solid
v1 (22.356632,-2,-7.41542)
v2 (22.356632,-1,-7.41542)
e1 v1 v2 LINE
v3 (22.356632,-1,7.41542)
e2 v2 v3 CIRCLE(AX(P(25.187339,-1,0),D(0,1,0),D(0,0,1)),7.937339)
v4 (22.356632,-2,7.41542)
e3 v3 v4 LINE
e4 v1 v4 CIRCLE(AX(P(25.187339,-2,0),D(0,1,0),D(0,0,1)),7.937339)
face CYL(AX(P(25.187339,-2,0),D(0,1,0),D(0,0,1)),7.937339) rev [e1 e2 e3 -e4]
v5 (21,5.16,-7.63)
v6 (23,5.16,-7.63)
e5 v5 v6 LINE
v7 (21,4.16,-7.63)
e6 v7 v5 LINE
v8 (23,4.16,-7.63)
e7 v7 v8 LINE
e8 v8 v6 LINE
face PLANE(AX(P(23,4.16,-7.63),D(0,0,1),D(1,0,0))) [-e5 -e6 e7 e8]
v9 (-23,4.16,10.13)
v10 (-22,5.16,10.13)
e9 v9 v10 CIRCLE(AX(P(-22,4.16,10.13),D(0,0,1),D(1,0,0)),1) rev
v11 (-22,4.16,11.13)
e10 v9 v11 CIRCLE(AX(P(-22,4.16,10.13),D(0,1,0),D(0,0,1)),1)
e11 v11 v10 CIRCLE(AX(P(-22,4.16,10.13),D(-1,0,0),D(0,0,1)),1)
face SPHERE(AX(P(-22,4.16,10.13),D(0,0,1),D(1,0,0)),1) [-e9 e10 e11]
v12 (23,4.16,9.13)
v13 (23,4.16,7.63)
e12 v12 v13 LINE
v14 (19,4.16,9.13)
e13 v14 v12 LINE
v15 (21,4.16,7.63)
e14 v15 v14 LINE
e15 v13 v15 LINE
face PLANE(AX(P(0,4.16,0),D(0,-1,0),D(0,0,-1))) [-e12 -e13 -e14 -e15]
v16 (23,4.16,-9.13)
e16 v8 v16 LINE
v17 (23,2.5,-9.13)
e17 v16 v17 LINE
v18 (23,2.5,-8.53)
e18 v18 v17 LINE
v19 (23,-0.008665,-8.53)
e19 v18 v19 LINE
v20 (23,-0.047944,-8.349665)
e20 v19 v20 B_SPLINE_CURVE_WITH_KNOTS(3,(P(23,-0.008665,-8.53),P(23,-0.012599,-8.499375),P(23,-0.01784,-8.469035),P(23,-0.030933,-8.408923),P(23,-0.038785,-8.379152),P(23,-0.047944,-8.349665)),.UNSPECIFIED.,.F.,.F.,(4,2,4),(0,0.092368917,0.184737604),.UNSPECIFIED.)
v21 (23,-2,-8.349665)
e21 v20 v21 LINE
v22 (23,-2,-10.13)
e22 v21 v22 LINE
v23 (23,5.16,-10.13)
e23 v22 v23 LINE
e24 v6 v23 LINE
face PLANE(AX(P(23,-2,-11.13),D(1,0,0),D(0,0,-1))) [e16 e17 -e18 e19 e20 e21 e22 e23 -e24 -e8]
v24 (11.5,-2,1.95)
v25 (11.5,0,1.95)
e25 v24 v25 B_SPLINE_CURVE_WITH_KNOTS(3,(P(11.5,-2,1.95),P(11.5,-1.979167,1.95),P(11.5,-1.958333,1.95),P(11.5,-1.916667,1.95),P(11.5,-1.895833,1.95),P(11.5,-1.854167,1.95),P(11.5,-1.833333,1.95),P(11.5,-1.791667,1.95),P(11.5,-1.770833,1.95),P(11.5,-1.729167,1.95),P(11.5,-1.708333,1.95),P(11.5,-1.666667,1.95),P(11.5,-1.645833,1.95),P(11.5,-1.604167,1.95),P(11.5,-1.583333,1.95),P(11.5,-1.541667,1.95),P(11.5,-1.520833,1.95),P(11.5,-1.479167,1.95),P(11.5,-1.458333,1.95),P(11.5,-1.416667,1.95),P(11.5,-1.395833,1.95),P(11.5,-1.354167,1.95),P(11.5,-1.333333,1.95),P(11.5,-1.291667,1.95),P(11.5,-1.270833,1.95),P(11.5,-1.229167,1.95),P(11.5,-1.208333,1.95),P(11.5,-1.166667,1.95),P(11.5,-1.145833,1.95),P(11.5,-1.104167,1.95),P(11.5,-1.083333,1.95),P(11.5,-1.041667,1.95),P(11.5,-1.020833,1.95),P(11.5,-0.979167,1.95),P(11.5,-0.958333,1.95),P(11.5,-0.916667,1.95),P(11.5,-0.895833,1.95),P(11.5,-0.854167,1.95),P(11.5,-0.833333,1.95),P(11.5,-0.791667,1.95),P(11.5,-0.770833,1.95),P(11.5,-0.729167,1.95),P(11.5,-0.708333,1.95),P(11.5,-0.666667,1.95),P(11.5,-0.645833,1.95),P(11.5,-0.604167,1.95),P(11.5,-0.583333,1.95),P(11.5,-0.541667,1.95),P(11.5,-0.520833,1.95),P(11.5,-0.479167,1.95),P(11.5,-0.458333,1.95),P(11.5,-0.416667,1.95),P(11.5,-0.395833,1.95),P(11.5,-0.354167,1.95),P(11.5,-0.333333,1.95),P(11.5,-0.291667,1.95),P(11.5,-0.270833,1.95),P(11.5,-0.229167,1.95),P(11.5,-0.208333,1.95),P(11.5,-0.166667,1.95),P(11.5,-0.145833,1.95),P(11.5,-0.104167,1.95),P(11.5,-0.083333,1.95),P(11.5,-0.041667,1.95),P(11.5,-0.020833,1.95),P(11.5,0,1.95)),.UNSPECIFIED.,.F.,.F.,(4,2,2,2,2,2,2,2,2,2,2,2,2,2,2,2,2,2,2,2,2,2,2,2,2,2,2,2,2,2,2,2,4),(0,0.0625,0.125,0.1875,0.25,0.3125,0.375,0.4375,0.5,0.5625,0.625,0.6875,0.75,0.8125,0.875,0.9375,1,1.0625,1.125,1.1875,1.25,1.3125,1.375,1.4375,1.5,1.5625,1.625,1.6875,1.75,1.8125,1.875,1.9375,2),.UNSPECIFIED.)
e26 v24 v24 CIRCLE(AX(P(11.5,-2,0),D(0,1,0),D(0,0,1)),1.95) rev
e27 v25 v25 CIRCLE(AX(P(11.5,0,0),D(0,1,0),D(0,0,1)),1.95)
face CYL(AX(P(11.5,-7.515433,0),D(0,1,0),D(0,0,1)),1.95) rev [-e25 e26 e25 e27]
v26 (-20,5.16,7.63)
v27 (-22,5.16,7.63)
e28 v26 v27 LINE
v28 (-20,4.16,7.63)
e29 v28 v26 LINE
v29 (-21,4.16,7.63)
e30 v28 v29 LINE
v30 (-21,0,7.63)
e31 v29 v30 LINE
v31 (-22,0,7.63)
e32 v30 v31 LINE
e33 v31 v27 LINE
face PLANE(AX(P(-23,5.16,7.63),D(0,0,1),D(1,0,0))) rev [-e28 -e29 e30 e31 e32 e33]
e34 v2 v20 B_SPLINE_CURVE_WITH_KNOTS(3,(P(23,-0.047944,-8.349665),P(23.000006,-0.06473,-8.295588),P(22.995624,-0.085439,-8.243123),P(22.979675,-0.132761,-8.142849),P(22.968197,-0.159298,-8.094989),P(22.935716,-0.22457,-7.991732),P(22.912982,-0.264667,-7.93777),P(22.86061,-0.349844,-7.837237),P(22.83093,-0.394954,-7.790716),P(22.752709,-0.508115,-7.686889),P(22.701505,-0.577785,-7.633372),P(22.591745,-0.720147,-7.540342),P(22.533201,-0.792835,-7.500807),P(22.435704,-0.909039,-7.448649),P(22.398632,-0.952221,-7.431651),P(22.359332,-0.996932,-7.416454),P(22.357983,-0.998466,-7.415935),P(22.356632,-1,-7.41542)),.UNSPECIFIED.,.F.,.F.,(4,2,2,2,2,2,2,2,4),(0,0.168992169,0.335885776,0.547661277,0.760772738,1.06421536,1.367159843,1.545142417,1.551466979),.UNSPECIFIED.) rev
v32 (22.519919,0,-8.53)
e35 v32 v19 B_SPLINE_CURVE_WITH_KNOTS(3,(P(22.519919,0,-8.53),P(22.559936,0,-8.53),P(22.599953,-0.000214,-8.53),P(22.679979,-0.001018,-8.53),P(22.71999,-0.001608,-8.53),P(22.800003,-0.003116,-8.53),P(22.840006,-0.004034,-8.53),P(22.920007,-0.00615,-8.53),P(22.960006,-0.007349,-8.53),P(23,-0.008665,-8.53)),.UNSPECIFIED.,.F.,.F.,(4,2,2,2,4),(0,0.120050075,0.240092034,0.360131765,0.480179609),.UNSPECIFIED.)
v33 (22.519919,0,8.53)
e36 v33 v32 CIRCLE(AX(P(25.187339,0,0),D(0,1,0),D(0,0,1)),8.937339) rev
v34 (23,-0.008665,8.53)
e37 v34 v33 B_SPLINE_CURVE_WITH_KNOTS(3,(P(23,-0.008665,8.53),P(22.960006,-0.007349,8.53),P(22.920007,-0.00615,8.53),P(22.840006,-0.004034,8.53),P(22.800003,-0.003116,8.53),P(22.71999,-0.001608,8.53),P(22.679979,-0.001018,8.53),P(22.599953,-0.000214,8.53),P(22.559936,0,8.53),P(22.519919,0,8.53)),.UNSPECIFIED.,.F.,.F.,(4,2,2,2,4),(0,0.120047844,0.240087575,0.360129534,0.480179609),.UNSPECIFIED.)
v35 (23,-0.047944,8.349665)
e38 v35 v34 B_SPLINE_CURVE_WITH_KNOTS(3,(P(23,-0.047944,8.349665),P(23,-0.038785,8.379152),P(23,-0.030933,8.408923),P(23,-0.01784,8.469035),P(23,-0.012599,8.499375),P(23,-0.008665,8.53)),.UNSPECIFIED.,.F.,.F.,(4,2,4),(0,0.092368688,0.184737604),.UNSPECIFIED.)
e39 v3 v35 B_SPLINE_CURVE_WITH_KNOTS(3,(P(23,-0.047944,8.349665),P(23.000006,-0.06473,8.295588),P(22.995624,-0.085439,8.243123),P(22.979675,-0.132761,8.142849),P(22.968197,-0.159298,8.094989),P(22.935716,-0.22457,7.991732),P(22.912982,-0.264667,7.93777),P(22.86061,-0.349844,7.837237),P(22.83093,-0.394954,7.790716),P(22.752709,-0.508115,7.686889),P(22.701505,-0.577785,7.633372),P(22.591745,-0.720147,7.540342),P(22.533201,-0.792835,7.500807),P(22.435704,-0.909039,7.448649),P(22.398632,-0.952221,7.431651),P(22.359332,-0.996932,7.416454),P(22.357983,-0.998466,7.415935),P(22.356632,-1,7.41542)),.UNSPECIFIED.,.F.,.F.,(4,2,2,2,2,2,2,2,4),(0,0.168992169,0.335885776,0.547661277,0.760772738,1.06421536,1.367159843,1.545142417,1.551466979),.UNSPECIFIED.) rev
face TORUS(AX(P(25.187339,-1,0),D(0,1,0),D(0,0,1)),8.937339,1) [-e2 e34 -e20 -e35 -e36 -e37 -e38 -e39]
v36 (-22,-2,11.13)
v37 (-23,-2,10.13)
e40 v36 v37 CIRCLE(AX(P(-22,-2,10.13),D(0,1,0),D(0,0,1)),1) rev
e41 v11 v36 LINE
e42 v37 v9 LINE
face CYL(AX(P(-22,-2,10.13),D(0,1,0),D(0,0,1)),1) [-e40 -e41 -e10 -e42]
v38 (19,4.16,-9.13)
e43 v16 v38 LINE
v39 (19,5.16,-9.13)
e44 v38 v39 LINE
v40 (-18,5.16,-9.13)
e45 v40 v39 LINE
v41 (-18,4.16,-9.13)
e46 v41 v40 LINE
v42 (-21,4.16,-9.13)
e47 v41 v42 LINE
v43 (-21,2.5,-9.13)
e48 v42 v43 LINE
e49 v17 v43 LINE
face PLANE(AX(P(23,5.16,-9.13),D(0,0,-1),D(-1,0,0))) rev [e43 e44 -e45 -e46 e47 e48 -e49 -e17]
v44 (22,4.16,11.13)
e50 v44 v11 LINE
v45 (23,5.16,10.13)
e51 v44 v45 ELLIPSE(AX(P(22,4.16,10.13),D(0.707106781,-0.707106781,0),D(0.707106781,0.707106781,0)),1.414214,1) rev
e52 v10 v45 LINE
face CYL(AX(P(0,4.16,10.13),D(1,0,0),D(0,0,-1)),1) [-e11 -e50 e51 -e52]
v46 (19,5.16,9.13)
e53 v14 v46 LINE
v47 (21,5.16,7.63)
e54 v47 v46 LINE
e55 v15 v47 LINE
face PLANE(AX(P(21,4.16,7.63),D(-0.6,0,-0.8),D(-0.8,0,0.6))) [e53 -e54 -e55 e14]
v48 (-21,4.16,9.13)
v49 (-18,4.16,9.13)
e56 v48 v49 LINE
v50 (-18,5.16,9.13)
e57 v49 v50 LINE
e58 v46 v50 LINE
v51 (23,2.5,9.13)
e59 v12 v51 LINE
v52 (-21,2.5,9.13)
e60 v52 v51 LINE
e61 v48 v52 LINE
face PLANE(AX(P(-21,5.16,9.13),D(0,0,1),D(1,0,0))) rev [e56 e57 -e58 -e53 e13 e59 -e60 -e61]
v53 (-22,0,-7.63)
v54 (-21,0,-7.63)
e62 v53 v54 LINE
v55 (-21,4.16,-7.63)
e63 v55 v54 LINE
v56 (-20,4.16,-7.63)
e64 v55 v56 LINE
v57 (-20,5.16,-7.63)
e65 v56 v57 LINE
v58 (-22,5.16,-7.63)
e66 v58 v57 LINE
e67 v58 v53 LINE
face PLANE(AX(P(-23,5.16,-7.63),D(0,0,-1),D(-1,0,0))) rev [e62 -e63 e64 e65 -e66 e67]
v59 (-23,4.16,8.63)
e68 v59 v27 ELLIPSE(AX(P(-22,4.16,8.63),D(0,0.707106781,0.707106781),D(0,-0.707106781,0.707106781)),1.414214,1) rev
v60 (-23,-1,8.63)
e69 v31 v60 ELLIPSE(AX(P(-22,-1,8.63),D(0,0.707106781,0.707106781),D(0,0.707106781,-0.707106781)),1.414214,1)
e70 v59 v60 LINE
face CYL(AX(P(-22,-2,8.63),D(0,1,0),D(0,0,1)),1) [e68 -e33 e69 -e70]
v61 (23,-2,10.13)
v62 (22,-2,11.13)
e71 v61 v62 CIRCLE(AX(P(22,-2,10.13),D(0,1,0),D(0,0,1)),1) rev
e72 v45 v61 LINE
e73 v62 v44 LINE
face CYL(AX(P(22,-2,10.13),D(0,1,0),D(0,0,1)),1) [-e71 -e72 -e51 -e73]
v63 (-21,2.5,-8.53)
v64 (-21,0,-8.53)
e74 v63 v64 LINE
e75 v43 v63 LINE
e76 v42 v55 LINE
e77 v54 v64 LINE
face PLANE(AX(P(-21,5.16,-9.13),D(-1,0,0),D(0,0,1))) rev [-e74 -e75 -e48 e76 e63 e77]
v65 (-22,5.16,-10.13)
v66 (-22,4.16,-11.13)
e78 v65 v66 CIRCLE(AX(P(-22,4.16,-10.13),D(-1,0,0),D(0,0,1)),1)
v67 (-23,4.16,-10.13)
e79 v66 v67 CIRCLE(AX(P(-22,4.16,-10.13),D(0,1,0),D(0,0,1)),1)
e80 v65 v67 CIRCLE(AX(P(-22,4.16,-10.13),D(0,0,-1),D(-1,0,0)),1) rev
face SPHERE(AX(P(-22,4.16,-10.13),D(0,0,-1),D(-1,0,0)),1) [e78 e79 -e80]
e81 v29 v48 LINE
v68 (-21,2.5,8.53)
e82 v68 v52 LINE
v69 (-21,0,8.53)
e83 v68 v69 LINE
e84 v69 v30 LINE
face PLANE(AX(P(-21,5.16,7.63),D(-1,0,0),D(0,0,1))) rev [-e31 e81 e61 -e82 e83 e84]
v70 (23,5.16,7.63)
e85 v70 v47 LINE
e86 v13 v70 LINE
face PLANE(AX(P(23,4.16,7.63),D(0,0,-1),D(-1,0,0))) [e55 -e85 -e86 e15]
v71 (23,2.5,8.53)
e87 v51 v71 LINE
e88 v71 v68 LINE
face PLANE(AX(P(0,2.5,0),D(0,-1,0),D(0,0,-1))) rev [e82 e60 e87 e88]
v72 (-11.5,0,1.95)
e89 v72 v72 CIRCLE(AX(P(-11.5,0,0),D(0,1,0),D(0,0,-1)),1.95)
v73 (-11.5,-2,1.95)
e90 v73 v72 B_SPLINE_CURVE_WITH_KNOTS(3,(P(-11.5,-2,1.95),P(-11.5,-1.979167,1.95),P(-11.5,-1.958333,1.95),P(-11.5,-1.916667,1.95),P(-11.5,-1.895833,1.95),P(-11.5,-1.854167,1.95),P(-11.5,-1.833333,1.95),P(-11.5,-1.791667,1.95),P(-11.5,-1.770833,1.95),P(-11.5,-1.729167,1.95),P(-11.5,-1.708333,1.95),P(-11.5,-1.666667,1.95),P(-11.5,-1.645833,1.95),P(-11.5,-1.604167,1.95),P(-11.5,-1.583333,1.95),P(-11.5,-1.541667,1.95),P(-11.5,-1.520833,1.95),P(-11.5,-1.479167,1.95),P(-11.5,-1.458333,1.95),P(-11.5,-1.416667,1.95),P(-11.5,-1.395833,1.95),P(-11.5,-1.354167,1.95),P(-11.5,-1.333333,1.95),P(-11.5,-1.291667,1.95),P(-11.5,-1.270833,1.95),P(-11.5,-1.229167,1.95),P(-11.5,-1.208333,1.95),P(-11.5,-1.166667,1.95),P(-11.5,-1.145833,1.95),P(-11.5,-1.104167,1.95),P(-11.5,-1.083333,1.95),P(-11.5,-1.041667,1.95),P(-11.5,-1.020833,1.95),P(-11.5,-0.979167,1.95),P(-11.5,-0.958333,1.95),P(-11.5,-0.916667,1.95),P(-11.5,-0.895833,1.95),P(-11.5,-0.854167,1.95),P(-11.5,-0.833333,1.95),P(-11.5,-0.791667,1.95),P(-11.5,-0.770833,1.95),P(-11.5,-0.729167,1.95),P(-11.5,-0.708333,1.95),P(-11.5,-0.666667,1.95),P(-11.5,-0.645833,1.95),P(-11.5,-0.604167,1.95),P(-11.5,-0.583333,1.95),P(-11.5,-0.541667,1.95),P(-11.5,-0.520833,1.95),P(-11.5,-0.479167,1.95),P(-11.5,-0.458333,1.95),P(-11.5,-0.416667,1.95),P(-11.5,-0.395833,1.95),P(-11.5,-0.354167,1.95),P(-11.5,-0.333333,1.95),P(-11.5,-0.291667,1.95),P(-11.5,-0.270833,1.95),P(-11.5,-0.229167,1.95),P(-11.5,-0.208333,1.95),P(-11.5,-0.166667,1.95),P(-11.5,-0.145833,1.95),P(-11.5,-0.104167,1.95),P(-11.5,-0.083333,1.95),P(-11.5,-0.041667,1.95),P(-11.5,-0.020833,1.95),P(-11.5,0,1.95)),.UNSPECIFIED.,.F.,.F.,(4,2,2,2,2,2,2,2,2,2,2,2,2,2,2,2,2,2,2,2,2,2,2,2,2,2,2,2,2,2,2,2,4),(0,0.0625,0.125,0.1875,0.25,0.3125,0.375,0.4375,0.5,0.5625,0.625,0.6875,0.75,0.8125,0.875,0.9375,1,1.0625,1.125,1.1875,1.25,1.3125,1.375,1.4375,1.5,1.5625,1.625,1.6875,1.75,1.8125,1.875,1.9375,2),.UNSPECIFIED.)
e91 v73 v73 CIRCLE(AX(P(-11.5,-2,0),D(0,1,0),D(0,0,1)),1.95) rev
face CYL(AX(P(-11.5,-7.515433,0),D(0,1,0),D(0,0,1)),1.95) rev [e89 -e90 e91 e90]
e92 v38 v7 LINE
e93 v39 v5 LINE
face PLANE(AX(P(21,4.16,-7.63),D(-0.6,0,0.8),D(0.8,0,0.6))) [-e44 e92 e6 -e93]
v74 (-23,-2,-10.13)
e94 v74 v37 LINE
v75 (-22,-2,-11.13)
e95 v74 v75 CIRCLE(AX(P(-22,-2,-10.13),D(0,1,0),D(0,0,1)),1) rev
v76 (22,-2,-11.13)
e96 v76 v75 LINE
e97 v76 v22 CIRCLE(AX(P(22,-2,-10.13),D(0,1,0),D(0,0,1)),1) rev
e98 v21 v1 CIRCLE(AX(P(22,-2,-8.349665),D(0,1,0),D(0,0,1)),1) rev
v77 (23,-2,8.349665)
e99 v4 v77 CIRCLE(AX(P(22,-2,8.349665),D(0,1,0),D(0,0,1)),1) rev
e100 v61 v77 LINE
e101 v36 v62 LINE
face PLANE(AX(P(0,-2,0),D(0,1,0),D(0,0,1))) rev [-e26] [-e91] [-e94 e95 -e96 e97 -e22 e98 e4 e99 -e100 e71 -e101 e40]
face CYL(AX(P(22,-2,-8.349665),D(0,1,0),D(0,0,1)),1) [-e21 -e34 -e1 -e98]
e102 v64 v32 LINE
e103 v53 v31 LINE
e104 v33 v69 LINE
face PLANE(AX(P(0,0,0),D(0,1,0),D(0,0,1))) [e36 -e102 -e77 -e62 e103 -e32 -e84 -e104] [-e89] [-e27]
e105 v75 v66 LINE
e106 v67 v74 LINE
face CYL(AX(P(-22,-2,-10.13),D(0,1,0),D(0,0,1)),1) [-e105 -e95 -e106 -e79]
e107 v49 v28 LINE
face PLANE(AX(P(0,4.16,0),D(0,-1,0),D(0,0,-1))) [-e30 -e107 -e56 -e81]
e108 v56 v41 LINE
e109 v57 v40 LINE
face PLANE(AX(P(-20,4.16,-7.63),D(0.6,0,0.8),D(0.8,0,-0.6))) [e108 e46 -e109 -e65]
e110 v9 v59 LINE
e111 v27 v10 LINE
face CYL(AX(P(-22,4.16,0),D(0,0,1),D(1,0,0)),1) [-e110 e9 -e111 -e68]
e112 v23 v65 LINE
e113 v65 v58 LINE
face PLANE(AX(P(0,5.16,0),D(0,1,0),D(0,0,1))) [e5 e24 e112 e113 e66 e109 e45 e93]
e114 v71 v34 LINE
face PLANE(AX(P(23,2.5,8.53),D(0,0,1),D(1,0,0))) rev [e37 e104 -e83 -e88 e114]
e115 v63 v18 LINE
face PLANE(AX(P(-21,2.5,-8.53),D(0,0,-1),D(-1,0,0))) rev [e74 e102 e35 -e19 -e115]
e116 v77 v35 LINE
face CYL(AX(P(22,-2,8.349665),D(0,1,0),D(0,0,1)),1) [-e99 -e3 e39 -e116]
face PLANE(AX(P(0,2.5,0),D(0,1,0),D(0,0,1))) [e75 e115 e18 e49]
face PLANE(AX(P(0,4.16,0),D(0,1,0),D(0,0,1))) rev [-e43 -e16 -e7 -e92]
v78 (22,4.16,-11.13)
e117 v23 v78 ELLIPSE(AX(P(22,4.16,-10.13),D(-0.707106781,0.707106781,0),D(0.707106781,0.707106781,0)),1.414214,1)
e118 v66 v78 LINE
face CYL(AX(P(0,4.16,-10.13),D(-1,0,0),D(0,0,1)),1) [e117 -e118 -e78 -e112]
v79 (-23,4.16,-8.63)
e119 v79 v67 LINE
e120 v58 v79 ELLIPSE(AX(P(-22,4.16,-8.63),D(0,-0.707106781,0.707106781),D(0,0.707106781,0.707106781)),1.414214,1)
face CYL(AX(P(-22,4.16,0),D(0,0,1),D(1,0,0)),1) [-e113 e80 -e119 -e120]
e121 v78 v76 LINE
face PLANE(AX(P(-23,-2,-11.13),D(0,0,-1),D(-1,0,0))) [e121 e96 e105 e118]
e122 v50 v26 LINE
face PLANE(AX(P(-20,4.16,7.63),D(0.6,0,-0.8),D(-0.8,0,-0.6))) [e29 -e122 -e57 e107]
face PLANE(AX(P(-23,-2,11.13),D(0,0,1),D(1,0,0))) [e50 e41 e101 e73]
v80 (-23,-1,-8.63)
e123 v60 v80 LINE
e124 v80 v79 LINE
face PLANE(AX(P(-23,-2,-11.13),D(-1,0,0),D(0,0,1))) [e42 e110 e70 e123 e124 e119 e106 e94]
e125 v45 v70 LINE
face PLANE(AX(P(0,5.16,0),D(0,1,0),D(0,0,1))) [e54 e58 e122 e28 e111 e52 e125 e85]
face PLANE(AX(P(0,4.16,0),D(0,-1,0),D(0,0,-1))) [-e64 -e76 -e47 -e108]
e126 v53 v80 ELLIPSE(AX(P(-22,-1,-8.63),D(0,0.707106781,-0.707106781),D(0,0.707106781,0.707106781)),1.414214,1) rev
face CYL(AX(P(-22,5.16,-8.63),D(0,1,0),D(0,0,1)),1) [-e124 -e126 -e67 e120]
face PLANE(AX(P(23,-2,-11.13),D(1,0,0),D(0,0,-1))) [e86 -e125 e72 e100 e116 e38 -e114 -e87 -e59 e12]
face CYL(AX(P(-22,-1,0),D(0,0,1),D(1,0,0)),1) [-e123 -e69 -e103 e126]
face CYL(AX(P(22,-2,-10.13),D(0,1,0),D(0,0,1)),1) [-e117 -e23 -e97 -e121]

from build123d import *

# Parameters (mm, degrees)
BASE_W                   = 46
BASE_H                   = 22.26
RESSALTO_EXTRUS_O1_DEPTH = 2
RESSALTO_EXTRUS_O2_DEPTH = 5.16
RESSALTO_EXTRUS_O3_DEPTH = 2.5
RESSALTO_EXTRUS_O4_DEPTH = 1
FUROS_R                  = 1.9500000000000008
FUROS_R_2                = 1.9500000000000002
CORTE_EXTRUS_O1_DEPTH    = 2
CORTE_EXTRUS_O2_DEPTH    = 27.067268748374858
FILETE1_R                = 1


with BuildPart() as part:
    # Base → Ressalto-extrusão1 (new body)
    with BuildSketch(Plane(origin=(0, 0, 0), x_dir=(1, 0, 0), z_dir=(0, 1, 0))):
        Rectangle(BASE_W, BASE_H)
    extrude(amount=-RESSALTO_EXTRUS_O1_DEPTH)

    # Parede_Ext → Ressalto-extrusão2 (add)
    with BuildSketch(Plane(origin=(0, 0, 0), x_dir=(1, 0, 0), z_dir=(0, 1, 0))):
        Polygon((-22.999999999999996, -11.129999999999999), (23.000000000000004, -11.129999999999999), (23.000000000000004, -9.129999999999995), (-20.999999999999993, -9.129999999999999), (-20.999999999999993, -7.63000000000001), (-22.99999999999999, -7.63000000000001), align=None)
        Polygon((-22.999999999999996, 11.130000000000003), (-22.999999999999993, 7.630000000000005), (-20.999999999999996, 7.630000000000005), (-20.999999999999996, 9.130000000000004), (23.000000000000004, 9.13000000000001), (23.000000000000004, 11.130000000000003), align=None)
    extrude(amount=RESSALTO_EXTRUS_O2_DEPTH)

    # Parede_Int → Ressalto-extrusão3 (add)
    with BuildSketch(Plane(origin=(0, 0, 0), x_dir=(1, 0, 0), z_dir=(0, 1, 0))):
        Polygon((23.000000000000004, -9.12999999999999), (-20.999999999999993, -9.129999999999999), (-20.999999999999993, -8.53), (23.000000000000004, -8.52999999999999), align=None)
        Polygon((-20.999999999999996, 9.130000000000004), (23.000000000000004, 9.13000000000001), (23, 8.530000000000008), (-20.999999999999996, 8.530000000000005), align=None)
    extrude(amount=RESSALTO_EXTRUS_O3_DEPTH)

    # Esboço4 → Ressalto-extrusão4 (add)
    with BuildSketch(Plane(origin=(0, 5.16, 0), x_dir=(1, 0, 0), z_dir=(0, 1, 0))):
        Polygon((-20.999999999999996, 7.630000000000005), (-19.999999999999996, 7.630000000000005), (-17.999999999999996, 9.130000000000004), (-20.999999999999996, 9.130000000000004), align=None)
        Polygon((23.000000000000004, 9.13000000000001), (23.000000000000007, 7.630000000000009), (21.000000000000004, 7.630000000000009), (19.000000000000004, 9.13000000000001), align=None)
        Polygon((23.000000000000007, -9.130000000000003), (23.00000000000001, -7.630000000000004), (21.000000000000007, -7.630000000000004), (19.000000000000007, -9.130000000000006), align=None)
        Polygon((-20.999999999999993, -7.63000000000001), (-20.999999999999993, -9.130000000000008), (-17.999999999999993, -9.130000000000008), (-19.999999999999993, -7.63000000000001), align=None)
    extrude(amount=-RESSALTO_EXTRUS_O4_DEPTH)

    # Furos → Corte-extrusão1 (cut)
    with BuildSketch(Plane(origin=(0, 0, 0), x_dir=(1, 0, 0), z_dir=(0, 1, 0))):
        with Locations(Location((11.500000000000002, 0, 0), (0, 0, 270))):
            Circle(FUROS_R)
        with Locations(Location((-11.500000000000002, -7.17e-15, 0), (0, 0, 270))):
            Circle(FUROS_R_2)
    extrude(amount=-CORTE_EXTRUS_O1_DEPTH, mode=Mode.SUBTRACT)

    # Esboço5 → Corte-extrusão2 (cut, through all)
    with BuildSketch(Plane(origin=(0, 0, 0), x_dir=(1, 0, 0), z_dir=(0, 1, 0))):
        with BuildLine():
            ThreePointArc((23, 7.630000000000013), (17.249999999999993, 4.22e-15), (22.999999999999996, -7.630000000000007))
            Line((23.000000000000004, -7.630000000000007), (23, 7.630000000000013))
        make_face()
    extrude(amount=-CORTE_EXTRUS_O2_DEPTH, mode=Mode.SUBTRACT)

    # Filete1
    # the kernel refuses this fillet: 1 mm, written as the material it takes off along each edge
    with BuildSketch(Plane(origin=(-21.999999999999996, 4.16, -10.130000000000003), x_dir=(-1, 0, 0), z_dir=(0, 0, -1))) as filete1_piece_1_section:
        Polygon((0, 0), (FILETE1_R * 1.02, 0), (FILETE1_R * 1.02, FILETE1_R * 1.02), (0, FILETE1_R * 1.02), align=None)
    filete1_piece_1 = extrude(amount=FILETE1_R * 1.02, mode=Mode.PRIVATE)
    filete1_piece_1 = filete1_piece_1 - Plane(origin=(-21.999999999999996, 4.16, -10.130000000000003), x_dir=(0.7071067811865475, -0.7071067811865475, 0), z_dir=(0, 0, -1)) * Sphere(FILETE1_R, mode=Mode.PRIVATE)
    add(filete1_piece_1, mode=Mode.SUBTRACT)
    with BuildSketch(Plane(origin=(-21.999999999999996, 4.16, 10.129999999999999), x_dir=(0, 0, 1), z_dir=(-1, 0, 0))) as filete1_piece_2_section:
        Polygon((0, 0), (FILETE1_R * 1.02, 0), (FILETE1_R * 1.02, FILETE1_R * 1.02), (0, FILETE1_R * 1.02), align=None)
    filete1_piece_2 = extrude(amount=FILETE1_R * 1.02, mode=Mode.PRIVATE)
    filete1_piece_2 = filete1_piece_2 - Plane(origin=(-21.999999999999996, 4.16, 10.129999999999999), x_dir=(0, -0.7071067811865475, -0.7071067811865475), z_dir=(-1, 0, 0)) * Sphere(FILETE1_R, mode=Mode.PRIVATE)
    add(filete1_piece_2, mode=Mode.SUBTRACT)
    with BuildSketch(Plane(origin=(23, 1.7991616598128402, 7.630000000000007), x_dir=(4.94e-15, 0, 1), z_dir=(0, -1, 0))) as filete1_piece_3:
        with BuildLine():
            CenterArc((0.7196646639251312, 1), FILETE1_R, 200.8934853742789, 69.10651462572139)
            ThreePointArc((-0.21458036606277414, 0.6433682235934401), (-0.1004154392092536, 0.32397702119423805), (0, 0))
            Line((0, 0), (0.7196646639251361, 0))
        make_face()
    extrude(amount=5.59832331962568, mode=Mode.SUBTRACT)
    with BuildSketch(Plane(origin=(23, 1.799161659812838, -7.630000000000013), x_dir=(4.94e-15, 0, -1), z_dir=(0, -1, 0))) as filete1_piece_4:
        with BuildLine():
            CenterArc((0.7196646639251303, -1), FILETE1_R, 89.99999999999972, 69.10651462572139)
            ThreePointArc((-0.21458036606277503, -0.6433682235934401), (-0.10041543920925448, -0.3239770211942416), (0, 0))
            Line((0, 0), (0.7196646639251352, 0))
        make_face()
    extrude(amount=5.598323319625676, mode=Mode.SUBTRACT)
    with BuildSketch(Plane(origin=(25.187339130434786, 0, -2.89e-15), x_dir=(0.036112789028829015, 0, -0.9993477205000065), z_dir=(0.9993477205000065, 0, 0.036112789028829015))) as filete1_piece_5_section:
        with BuildLine():
            CenterArc((7.937339130434793 + FILETE1_R, -FILETE1_R), FILETE1_R, 90, 90)
            Line((7.937339130434793, -FILETE1_R), (7.937339130434793, 0))
            Line((7.937339130434793, 0), (7.937339130434793 + FILETE1_R, 0))
        make_face()
    filete1_piece_5 = revolve(axis=Axis((25.187339130434786, 0, -2.89e-15), (0, 1, 0)), revolution_arc=184.13912078928365, mode=Mode.PRIVATE)
    filete1_piece_5 = split(filete1_piece_5, bisect_by=Plane(origin=(25.187339130434786, 0, -8.530000000000008), z_dir=(8e-17, 0, 1)), keep=Keep.TOP, mode=Mode.PRIVATE)
    filete1_piece_5 = split(filete1_piece_5, bisect_by=Plane(origin=(25.187339130434786, 0, 8.52999999999999), z_dir=(-2e-16, 0, -1)), keep=Keep.TOP, mode=Mode.PRIVATE)
    add(filete1_piece_5, mode=Mode.SUBTRACT)
    with BuildSketch(Plane(origin=(-22.99999999999999, 0, 7.63000000000001), x_dir=(-7.11e-15, 0, 1), z_dir=(0, 1, 0))) as filete1_piece_6:
        with BuildLine():
            CenterArc((FILETE1_R, FILETE1_R), FILETE1_R, 180, 90.0000000000004)
            Line((-7.11e-15, FILETE1_R), (0, 0))
            Line((0, 0), (FILETE1_R, 0))
        make_face()
    extrude(amount=7.66, mode=Mode.SUBTRACT)
    with BuildSketch(Plane(origin=(-22.999999999999993, 0, -7.630000000000005), x_dir=(-3.55e-15, 0, -1), z_dir=(0, 1, 0))) as filete1_piece_7:
        with BuildLine():
            CenterArc((FILETE1_R, -FILETE1_R), FILETE1_R, 89.9999999999998, 90.0000000000002)
            Line((-2.66e-15, -FILETE1_R), (0, 0))
            Line((0, 0), (FILETE1_R, 0))
        make_face()
    extrude(amount=7.660000000000002, mode=Mode.SUBTRACT)
    with BuildSketch(Plane(origin=(-22.999999999999996, 0, 7.63000000000001), x_dir=(0, -1, 0), z_dir=(0, 0, -1))) as filete1_piece_8:
        with BuildLine():
            CenterArc((FILETE1_R, -FILETE1_R), FILETE1_R, 90, 90)
            Line((-1.1e-16, -FILETE1_R), (0, 0))
            Line((0, 0), (FILETE1_R, 0))
        make_face()
    extrude(amount=15.260000000000016, mode=Mode.SUBTRACT)
    with BuildSketch(Plane(origin=(-22.999999999999996, 5.16, -10.13), x_dir=(-3.55e-15, -1, 0), z_dir=(1.02e-15, 0, 1))) as filete1_piece_9:
        with BuildLine():
            CenterArc((FILETE1_R, FILETE1_R), FILETE1_R, 180, 90.00000000000023)
            Line((-3.55e-15, FILETE1_R), (0, 0))
            Line((0, 0), (FILETE1_R, 0))
        make_face()
    extrude(amount=4.999999999999996, mode=Mode.SUBTRACT)
    with BuildSketch(Plane(origin=(-22.999999999999996, -4.5, -11.130000000000003), x_dir=(1, 0, 0), z_dir=(0, 1, 0))) as filete1_piece_10:
        with BuildLine():
            CenterArc((FILETE1_R, -FILETE1_R), FILETE1_R, 90, 90)
            Line((0, -FILETE1_R), (0, 0))
            Line((0, 0), (FILETE1_R, 0))
        make_face()
    extrude(amount=8.66, mode=Mode.SUBTRACT)
    with BuildSketch(Plane(origin=(-22.999999999999996, -4.5, 11.129999999999999), x_dir=(0, 0, -1), z_dir=(0, 1, 0))) as filete1_piece_11:
        with BuildLine():
            CenterArc((FILETE1_R, -FILETE1_R), FILETE1_R, 90, 90)
            Line((0, -FILETE1_R), (0, 0))
            Line((0, 0), (FILETE1_R, 0))
        make_face()
    extrude(amount=8.66, mode=Mode.SUBTRACT)
    with BuildSketch(Plane(origin=(-22.999999999999986, 5.16, 5.13000000000001), x_dir=(-3.55e-15, -1, 0), z_dir=(-2.03e-15, 0, 1))) as filete1_piece_12:
        with BuildLine():
            CenterArc((FILETE1_R, FILETE1_R), FILETE1_R, 180, 90.00000000000023)
            Line((-3.55e-15, FILETE1_R), (0, 0))
            Line((0, 0), (FILETE1_R, 0))
        make_face()
    extrude(amount=4.999999999999989, mode=Mode.SUBTRACT)
    with BuildSketch(Plane(origin=(25.500000000000004, 5.16, -11.130000000000003), x_dir=(0, -1, 0), z_dir=(-1, 0, 0)), Plane(origin=(-21.999999999999996, 5.16, 11.129999999999999), x_dir=(0, -1, 0), z_dir=(1, 0, 0))) as filete1_piece_13:
        with BuildLine():
            CenterArc((FILETE1_R, FILETE1_R), FILETE1_R, 180, 90)
            Line((0, FILETE1_R), (0, 0))
            Line((0, 0), (FILETE1_R, 0))
        make_face()
    extrude(amount=47.5, mode=Mode.SUBTRACT)
    with BuildSketch(Plane(origin=(23.000000000000004, 7.66, -11.130000000000003), x_dir=(-1, 0, 0), z_dir=(0, -1, 0))) as filete1_piece_14:
        with BuildLine():
            CenterArc((FILETE1_R, -FILETE1_R), FILETE1_R, 90, 90)
            Line((0, -FILETE1_R), (0, 0))
            Line((0, 0), (FILETE1_R, 0))
        make_face()
    extrude(amount=12.16, mode=Mode.SUBTRACT)
    with BuildSketch(Plane(origin=(23.000000000000004, 7.66, 11.129999999999999), x_dir=(-1, 0, 0), z_dir=(0, -1, 0))) as filete1_piece_15:
        with BuildLine():
            CenterArc((FILETE1_R, FILETE1_R), FILETE1_R, 180, 90)
            Line((0, FILETE1_R), (0, 0))
            Line((0, 0), (FILETE1_R, 0))
        make_face()
    extrude(amount=12.16, mode=Mode.SUBTRACT)
    with BuildSketch(Plane(origin=(-22.999999999999996, 0, 10.13000000000001), x_dir=(0, -1, 0), z_dir=(0, 0, -1))) as filete1_piece_16a_section:
        with BuildLine():
            CenterArc((FILETE1_R, -FILETE1_R), FILETE1_R, 90, 90)
            Line((-1.1e-16, -FILETE1_R), (0, 0))
            Line((0, 0), (FILETE1_R, 0))
        make_face()
    filete1_piece_16a = extrude(amount=17.760000000000016, mode=Mode.PRIVATE)
    filete1_piece_16a = split(filete1_piece_16a, bisect_by=Plane(origin=(-22.999999999999996, 0, 7.63000000000001), z_dir=(0, 0, 1)), keep=Keep.TOP, mode=Mode.PRIVATE)
    with BuildSketch(Plane(origin=(-22.99999999999999, -2.5, 7.63000000000001), x_dir=(-7.11e-15, 0, 1), z_dir=(0, 1, 0))) as filete1_piece_16b_section:
        with BuildLine():
            CenterArc((FILETE1_R, FILETE1_R), FILETE1_R, 180, 90.0000000000004)
            Line((-7.11e-15, FILETE1_R), (0, 0))
            Line((0, 0), (FILETE1_R, 0))
        make_face()
    filete1_piece_16b = extrude(amount=7.66, mode=Mode.PRIVATE)
    filete1_piece_16b = split(filete1_piece_16b, bisect_by=Plane(origin=(-22.99999999999999, -2, 7.63000000000001), z_dir=(0, 1, 0)), keep=Keep.TOP, mode=Mode.PRIVATE)
    filete1_piece_16b = split(filete1_piece_16b, bisect_by=Plane(origin=(-22.99999999999999, 0, 7.63000000000001), z_dir=(0, -1, 0)), keep=Keep.TOP, mode=Mode.PRIVATE)
    filete1_piece_16 = filete1_piece_16a & filete1_piece_16b
    add(filete1_piece_16, mode=Mode.SUBTRACT)
    with BuildSketch(Plane(origin=(-22.999999999999993, -2.5000000000000018, -7.630000000000005), x_dir=(-3.55e-15, 0, -1), z_dir=(0, 1, 0))) as filete1_piece_17a_section:
        with BuildLine():
            CenterArc((FILETE1_R, -FILETE1_R), FILETE1_R, 89.9999999999998, 90.0000000000002)
            Line((-2.66e-15, -FILETE1_R), (0, 0))
            Line((0, 0), (FILETE1_R, 0))
        make_face()
    filete1_piece_17a = extrude(amount=7.660000000000002, mode=Mode.PRIVATE)
    filete1_piece_17a = split(filete1_piece_17a, bisect_by=Plane(origin=(-22.999999999999993, -2, -7.630000000000005), z_dir=(0, 1, 0)), keep=Keep.TOP, mode=Mode.PRIVATE)
    filete1_piece_17a = split(filete1_piece_17a, bisect_by=Plane(origin=(-22.999999999999993, 0, -7.630000000000005), z_dir=(0, -1, 0)), keep=Keep.TOP, mode=Mode.PRIVATE)
    with BuildSketch(Plane(origin=(-22.999999999999996, 0, 7.63000000000001), x_dir=(0, -1, 0), z_dir=(0, 0, -1))) as filete1_piece_17b_section:
        with BuildLine():
            CenterArc((FILETE1_R, -FILETE1_R), FILETE1_R, 90, 90)
            Line((-1.1e-16, -FILETE1_R), (0, 0))
            Line((0, 0), (FILETE1_R, 0))
        make_face()
    filete1_piece_17b = extrude(amount=17.760000000000016, mode=Mode.PRIVATE)
    filete1_piece_17b = split(filete1_piece_17b, bisect_by=Plane(origin=(-22.999999999999996, 0, -7.630000000000006), z_dir=(0, 0, -1)), keep=Keep.TOP, mode=Mode.PRIVATE)
    filete1_piece_17 = filete1_piece_17a & filete1_piece_17b
    add(filete1_piece_17, mode=Mode.SUBTRACT)


solid = part.part
